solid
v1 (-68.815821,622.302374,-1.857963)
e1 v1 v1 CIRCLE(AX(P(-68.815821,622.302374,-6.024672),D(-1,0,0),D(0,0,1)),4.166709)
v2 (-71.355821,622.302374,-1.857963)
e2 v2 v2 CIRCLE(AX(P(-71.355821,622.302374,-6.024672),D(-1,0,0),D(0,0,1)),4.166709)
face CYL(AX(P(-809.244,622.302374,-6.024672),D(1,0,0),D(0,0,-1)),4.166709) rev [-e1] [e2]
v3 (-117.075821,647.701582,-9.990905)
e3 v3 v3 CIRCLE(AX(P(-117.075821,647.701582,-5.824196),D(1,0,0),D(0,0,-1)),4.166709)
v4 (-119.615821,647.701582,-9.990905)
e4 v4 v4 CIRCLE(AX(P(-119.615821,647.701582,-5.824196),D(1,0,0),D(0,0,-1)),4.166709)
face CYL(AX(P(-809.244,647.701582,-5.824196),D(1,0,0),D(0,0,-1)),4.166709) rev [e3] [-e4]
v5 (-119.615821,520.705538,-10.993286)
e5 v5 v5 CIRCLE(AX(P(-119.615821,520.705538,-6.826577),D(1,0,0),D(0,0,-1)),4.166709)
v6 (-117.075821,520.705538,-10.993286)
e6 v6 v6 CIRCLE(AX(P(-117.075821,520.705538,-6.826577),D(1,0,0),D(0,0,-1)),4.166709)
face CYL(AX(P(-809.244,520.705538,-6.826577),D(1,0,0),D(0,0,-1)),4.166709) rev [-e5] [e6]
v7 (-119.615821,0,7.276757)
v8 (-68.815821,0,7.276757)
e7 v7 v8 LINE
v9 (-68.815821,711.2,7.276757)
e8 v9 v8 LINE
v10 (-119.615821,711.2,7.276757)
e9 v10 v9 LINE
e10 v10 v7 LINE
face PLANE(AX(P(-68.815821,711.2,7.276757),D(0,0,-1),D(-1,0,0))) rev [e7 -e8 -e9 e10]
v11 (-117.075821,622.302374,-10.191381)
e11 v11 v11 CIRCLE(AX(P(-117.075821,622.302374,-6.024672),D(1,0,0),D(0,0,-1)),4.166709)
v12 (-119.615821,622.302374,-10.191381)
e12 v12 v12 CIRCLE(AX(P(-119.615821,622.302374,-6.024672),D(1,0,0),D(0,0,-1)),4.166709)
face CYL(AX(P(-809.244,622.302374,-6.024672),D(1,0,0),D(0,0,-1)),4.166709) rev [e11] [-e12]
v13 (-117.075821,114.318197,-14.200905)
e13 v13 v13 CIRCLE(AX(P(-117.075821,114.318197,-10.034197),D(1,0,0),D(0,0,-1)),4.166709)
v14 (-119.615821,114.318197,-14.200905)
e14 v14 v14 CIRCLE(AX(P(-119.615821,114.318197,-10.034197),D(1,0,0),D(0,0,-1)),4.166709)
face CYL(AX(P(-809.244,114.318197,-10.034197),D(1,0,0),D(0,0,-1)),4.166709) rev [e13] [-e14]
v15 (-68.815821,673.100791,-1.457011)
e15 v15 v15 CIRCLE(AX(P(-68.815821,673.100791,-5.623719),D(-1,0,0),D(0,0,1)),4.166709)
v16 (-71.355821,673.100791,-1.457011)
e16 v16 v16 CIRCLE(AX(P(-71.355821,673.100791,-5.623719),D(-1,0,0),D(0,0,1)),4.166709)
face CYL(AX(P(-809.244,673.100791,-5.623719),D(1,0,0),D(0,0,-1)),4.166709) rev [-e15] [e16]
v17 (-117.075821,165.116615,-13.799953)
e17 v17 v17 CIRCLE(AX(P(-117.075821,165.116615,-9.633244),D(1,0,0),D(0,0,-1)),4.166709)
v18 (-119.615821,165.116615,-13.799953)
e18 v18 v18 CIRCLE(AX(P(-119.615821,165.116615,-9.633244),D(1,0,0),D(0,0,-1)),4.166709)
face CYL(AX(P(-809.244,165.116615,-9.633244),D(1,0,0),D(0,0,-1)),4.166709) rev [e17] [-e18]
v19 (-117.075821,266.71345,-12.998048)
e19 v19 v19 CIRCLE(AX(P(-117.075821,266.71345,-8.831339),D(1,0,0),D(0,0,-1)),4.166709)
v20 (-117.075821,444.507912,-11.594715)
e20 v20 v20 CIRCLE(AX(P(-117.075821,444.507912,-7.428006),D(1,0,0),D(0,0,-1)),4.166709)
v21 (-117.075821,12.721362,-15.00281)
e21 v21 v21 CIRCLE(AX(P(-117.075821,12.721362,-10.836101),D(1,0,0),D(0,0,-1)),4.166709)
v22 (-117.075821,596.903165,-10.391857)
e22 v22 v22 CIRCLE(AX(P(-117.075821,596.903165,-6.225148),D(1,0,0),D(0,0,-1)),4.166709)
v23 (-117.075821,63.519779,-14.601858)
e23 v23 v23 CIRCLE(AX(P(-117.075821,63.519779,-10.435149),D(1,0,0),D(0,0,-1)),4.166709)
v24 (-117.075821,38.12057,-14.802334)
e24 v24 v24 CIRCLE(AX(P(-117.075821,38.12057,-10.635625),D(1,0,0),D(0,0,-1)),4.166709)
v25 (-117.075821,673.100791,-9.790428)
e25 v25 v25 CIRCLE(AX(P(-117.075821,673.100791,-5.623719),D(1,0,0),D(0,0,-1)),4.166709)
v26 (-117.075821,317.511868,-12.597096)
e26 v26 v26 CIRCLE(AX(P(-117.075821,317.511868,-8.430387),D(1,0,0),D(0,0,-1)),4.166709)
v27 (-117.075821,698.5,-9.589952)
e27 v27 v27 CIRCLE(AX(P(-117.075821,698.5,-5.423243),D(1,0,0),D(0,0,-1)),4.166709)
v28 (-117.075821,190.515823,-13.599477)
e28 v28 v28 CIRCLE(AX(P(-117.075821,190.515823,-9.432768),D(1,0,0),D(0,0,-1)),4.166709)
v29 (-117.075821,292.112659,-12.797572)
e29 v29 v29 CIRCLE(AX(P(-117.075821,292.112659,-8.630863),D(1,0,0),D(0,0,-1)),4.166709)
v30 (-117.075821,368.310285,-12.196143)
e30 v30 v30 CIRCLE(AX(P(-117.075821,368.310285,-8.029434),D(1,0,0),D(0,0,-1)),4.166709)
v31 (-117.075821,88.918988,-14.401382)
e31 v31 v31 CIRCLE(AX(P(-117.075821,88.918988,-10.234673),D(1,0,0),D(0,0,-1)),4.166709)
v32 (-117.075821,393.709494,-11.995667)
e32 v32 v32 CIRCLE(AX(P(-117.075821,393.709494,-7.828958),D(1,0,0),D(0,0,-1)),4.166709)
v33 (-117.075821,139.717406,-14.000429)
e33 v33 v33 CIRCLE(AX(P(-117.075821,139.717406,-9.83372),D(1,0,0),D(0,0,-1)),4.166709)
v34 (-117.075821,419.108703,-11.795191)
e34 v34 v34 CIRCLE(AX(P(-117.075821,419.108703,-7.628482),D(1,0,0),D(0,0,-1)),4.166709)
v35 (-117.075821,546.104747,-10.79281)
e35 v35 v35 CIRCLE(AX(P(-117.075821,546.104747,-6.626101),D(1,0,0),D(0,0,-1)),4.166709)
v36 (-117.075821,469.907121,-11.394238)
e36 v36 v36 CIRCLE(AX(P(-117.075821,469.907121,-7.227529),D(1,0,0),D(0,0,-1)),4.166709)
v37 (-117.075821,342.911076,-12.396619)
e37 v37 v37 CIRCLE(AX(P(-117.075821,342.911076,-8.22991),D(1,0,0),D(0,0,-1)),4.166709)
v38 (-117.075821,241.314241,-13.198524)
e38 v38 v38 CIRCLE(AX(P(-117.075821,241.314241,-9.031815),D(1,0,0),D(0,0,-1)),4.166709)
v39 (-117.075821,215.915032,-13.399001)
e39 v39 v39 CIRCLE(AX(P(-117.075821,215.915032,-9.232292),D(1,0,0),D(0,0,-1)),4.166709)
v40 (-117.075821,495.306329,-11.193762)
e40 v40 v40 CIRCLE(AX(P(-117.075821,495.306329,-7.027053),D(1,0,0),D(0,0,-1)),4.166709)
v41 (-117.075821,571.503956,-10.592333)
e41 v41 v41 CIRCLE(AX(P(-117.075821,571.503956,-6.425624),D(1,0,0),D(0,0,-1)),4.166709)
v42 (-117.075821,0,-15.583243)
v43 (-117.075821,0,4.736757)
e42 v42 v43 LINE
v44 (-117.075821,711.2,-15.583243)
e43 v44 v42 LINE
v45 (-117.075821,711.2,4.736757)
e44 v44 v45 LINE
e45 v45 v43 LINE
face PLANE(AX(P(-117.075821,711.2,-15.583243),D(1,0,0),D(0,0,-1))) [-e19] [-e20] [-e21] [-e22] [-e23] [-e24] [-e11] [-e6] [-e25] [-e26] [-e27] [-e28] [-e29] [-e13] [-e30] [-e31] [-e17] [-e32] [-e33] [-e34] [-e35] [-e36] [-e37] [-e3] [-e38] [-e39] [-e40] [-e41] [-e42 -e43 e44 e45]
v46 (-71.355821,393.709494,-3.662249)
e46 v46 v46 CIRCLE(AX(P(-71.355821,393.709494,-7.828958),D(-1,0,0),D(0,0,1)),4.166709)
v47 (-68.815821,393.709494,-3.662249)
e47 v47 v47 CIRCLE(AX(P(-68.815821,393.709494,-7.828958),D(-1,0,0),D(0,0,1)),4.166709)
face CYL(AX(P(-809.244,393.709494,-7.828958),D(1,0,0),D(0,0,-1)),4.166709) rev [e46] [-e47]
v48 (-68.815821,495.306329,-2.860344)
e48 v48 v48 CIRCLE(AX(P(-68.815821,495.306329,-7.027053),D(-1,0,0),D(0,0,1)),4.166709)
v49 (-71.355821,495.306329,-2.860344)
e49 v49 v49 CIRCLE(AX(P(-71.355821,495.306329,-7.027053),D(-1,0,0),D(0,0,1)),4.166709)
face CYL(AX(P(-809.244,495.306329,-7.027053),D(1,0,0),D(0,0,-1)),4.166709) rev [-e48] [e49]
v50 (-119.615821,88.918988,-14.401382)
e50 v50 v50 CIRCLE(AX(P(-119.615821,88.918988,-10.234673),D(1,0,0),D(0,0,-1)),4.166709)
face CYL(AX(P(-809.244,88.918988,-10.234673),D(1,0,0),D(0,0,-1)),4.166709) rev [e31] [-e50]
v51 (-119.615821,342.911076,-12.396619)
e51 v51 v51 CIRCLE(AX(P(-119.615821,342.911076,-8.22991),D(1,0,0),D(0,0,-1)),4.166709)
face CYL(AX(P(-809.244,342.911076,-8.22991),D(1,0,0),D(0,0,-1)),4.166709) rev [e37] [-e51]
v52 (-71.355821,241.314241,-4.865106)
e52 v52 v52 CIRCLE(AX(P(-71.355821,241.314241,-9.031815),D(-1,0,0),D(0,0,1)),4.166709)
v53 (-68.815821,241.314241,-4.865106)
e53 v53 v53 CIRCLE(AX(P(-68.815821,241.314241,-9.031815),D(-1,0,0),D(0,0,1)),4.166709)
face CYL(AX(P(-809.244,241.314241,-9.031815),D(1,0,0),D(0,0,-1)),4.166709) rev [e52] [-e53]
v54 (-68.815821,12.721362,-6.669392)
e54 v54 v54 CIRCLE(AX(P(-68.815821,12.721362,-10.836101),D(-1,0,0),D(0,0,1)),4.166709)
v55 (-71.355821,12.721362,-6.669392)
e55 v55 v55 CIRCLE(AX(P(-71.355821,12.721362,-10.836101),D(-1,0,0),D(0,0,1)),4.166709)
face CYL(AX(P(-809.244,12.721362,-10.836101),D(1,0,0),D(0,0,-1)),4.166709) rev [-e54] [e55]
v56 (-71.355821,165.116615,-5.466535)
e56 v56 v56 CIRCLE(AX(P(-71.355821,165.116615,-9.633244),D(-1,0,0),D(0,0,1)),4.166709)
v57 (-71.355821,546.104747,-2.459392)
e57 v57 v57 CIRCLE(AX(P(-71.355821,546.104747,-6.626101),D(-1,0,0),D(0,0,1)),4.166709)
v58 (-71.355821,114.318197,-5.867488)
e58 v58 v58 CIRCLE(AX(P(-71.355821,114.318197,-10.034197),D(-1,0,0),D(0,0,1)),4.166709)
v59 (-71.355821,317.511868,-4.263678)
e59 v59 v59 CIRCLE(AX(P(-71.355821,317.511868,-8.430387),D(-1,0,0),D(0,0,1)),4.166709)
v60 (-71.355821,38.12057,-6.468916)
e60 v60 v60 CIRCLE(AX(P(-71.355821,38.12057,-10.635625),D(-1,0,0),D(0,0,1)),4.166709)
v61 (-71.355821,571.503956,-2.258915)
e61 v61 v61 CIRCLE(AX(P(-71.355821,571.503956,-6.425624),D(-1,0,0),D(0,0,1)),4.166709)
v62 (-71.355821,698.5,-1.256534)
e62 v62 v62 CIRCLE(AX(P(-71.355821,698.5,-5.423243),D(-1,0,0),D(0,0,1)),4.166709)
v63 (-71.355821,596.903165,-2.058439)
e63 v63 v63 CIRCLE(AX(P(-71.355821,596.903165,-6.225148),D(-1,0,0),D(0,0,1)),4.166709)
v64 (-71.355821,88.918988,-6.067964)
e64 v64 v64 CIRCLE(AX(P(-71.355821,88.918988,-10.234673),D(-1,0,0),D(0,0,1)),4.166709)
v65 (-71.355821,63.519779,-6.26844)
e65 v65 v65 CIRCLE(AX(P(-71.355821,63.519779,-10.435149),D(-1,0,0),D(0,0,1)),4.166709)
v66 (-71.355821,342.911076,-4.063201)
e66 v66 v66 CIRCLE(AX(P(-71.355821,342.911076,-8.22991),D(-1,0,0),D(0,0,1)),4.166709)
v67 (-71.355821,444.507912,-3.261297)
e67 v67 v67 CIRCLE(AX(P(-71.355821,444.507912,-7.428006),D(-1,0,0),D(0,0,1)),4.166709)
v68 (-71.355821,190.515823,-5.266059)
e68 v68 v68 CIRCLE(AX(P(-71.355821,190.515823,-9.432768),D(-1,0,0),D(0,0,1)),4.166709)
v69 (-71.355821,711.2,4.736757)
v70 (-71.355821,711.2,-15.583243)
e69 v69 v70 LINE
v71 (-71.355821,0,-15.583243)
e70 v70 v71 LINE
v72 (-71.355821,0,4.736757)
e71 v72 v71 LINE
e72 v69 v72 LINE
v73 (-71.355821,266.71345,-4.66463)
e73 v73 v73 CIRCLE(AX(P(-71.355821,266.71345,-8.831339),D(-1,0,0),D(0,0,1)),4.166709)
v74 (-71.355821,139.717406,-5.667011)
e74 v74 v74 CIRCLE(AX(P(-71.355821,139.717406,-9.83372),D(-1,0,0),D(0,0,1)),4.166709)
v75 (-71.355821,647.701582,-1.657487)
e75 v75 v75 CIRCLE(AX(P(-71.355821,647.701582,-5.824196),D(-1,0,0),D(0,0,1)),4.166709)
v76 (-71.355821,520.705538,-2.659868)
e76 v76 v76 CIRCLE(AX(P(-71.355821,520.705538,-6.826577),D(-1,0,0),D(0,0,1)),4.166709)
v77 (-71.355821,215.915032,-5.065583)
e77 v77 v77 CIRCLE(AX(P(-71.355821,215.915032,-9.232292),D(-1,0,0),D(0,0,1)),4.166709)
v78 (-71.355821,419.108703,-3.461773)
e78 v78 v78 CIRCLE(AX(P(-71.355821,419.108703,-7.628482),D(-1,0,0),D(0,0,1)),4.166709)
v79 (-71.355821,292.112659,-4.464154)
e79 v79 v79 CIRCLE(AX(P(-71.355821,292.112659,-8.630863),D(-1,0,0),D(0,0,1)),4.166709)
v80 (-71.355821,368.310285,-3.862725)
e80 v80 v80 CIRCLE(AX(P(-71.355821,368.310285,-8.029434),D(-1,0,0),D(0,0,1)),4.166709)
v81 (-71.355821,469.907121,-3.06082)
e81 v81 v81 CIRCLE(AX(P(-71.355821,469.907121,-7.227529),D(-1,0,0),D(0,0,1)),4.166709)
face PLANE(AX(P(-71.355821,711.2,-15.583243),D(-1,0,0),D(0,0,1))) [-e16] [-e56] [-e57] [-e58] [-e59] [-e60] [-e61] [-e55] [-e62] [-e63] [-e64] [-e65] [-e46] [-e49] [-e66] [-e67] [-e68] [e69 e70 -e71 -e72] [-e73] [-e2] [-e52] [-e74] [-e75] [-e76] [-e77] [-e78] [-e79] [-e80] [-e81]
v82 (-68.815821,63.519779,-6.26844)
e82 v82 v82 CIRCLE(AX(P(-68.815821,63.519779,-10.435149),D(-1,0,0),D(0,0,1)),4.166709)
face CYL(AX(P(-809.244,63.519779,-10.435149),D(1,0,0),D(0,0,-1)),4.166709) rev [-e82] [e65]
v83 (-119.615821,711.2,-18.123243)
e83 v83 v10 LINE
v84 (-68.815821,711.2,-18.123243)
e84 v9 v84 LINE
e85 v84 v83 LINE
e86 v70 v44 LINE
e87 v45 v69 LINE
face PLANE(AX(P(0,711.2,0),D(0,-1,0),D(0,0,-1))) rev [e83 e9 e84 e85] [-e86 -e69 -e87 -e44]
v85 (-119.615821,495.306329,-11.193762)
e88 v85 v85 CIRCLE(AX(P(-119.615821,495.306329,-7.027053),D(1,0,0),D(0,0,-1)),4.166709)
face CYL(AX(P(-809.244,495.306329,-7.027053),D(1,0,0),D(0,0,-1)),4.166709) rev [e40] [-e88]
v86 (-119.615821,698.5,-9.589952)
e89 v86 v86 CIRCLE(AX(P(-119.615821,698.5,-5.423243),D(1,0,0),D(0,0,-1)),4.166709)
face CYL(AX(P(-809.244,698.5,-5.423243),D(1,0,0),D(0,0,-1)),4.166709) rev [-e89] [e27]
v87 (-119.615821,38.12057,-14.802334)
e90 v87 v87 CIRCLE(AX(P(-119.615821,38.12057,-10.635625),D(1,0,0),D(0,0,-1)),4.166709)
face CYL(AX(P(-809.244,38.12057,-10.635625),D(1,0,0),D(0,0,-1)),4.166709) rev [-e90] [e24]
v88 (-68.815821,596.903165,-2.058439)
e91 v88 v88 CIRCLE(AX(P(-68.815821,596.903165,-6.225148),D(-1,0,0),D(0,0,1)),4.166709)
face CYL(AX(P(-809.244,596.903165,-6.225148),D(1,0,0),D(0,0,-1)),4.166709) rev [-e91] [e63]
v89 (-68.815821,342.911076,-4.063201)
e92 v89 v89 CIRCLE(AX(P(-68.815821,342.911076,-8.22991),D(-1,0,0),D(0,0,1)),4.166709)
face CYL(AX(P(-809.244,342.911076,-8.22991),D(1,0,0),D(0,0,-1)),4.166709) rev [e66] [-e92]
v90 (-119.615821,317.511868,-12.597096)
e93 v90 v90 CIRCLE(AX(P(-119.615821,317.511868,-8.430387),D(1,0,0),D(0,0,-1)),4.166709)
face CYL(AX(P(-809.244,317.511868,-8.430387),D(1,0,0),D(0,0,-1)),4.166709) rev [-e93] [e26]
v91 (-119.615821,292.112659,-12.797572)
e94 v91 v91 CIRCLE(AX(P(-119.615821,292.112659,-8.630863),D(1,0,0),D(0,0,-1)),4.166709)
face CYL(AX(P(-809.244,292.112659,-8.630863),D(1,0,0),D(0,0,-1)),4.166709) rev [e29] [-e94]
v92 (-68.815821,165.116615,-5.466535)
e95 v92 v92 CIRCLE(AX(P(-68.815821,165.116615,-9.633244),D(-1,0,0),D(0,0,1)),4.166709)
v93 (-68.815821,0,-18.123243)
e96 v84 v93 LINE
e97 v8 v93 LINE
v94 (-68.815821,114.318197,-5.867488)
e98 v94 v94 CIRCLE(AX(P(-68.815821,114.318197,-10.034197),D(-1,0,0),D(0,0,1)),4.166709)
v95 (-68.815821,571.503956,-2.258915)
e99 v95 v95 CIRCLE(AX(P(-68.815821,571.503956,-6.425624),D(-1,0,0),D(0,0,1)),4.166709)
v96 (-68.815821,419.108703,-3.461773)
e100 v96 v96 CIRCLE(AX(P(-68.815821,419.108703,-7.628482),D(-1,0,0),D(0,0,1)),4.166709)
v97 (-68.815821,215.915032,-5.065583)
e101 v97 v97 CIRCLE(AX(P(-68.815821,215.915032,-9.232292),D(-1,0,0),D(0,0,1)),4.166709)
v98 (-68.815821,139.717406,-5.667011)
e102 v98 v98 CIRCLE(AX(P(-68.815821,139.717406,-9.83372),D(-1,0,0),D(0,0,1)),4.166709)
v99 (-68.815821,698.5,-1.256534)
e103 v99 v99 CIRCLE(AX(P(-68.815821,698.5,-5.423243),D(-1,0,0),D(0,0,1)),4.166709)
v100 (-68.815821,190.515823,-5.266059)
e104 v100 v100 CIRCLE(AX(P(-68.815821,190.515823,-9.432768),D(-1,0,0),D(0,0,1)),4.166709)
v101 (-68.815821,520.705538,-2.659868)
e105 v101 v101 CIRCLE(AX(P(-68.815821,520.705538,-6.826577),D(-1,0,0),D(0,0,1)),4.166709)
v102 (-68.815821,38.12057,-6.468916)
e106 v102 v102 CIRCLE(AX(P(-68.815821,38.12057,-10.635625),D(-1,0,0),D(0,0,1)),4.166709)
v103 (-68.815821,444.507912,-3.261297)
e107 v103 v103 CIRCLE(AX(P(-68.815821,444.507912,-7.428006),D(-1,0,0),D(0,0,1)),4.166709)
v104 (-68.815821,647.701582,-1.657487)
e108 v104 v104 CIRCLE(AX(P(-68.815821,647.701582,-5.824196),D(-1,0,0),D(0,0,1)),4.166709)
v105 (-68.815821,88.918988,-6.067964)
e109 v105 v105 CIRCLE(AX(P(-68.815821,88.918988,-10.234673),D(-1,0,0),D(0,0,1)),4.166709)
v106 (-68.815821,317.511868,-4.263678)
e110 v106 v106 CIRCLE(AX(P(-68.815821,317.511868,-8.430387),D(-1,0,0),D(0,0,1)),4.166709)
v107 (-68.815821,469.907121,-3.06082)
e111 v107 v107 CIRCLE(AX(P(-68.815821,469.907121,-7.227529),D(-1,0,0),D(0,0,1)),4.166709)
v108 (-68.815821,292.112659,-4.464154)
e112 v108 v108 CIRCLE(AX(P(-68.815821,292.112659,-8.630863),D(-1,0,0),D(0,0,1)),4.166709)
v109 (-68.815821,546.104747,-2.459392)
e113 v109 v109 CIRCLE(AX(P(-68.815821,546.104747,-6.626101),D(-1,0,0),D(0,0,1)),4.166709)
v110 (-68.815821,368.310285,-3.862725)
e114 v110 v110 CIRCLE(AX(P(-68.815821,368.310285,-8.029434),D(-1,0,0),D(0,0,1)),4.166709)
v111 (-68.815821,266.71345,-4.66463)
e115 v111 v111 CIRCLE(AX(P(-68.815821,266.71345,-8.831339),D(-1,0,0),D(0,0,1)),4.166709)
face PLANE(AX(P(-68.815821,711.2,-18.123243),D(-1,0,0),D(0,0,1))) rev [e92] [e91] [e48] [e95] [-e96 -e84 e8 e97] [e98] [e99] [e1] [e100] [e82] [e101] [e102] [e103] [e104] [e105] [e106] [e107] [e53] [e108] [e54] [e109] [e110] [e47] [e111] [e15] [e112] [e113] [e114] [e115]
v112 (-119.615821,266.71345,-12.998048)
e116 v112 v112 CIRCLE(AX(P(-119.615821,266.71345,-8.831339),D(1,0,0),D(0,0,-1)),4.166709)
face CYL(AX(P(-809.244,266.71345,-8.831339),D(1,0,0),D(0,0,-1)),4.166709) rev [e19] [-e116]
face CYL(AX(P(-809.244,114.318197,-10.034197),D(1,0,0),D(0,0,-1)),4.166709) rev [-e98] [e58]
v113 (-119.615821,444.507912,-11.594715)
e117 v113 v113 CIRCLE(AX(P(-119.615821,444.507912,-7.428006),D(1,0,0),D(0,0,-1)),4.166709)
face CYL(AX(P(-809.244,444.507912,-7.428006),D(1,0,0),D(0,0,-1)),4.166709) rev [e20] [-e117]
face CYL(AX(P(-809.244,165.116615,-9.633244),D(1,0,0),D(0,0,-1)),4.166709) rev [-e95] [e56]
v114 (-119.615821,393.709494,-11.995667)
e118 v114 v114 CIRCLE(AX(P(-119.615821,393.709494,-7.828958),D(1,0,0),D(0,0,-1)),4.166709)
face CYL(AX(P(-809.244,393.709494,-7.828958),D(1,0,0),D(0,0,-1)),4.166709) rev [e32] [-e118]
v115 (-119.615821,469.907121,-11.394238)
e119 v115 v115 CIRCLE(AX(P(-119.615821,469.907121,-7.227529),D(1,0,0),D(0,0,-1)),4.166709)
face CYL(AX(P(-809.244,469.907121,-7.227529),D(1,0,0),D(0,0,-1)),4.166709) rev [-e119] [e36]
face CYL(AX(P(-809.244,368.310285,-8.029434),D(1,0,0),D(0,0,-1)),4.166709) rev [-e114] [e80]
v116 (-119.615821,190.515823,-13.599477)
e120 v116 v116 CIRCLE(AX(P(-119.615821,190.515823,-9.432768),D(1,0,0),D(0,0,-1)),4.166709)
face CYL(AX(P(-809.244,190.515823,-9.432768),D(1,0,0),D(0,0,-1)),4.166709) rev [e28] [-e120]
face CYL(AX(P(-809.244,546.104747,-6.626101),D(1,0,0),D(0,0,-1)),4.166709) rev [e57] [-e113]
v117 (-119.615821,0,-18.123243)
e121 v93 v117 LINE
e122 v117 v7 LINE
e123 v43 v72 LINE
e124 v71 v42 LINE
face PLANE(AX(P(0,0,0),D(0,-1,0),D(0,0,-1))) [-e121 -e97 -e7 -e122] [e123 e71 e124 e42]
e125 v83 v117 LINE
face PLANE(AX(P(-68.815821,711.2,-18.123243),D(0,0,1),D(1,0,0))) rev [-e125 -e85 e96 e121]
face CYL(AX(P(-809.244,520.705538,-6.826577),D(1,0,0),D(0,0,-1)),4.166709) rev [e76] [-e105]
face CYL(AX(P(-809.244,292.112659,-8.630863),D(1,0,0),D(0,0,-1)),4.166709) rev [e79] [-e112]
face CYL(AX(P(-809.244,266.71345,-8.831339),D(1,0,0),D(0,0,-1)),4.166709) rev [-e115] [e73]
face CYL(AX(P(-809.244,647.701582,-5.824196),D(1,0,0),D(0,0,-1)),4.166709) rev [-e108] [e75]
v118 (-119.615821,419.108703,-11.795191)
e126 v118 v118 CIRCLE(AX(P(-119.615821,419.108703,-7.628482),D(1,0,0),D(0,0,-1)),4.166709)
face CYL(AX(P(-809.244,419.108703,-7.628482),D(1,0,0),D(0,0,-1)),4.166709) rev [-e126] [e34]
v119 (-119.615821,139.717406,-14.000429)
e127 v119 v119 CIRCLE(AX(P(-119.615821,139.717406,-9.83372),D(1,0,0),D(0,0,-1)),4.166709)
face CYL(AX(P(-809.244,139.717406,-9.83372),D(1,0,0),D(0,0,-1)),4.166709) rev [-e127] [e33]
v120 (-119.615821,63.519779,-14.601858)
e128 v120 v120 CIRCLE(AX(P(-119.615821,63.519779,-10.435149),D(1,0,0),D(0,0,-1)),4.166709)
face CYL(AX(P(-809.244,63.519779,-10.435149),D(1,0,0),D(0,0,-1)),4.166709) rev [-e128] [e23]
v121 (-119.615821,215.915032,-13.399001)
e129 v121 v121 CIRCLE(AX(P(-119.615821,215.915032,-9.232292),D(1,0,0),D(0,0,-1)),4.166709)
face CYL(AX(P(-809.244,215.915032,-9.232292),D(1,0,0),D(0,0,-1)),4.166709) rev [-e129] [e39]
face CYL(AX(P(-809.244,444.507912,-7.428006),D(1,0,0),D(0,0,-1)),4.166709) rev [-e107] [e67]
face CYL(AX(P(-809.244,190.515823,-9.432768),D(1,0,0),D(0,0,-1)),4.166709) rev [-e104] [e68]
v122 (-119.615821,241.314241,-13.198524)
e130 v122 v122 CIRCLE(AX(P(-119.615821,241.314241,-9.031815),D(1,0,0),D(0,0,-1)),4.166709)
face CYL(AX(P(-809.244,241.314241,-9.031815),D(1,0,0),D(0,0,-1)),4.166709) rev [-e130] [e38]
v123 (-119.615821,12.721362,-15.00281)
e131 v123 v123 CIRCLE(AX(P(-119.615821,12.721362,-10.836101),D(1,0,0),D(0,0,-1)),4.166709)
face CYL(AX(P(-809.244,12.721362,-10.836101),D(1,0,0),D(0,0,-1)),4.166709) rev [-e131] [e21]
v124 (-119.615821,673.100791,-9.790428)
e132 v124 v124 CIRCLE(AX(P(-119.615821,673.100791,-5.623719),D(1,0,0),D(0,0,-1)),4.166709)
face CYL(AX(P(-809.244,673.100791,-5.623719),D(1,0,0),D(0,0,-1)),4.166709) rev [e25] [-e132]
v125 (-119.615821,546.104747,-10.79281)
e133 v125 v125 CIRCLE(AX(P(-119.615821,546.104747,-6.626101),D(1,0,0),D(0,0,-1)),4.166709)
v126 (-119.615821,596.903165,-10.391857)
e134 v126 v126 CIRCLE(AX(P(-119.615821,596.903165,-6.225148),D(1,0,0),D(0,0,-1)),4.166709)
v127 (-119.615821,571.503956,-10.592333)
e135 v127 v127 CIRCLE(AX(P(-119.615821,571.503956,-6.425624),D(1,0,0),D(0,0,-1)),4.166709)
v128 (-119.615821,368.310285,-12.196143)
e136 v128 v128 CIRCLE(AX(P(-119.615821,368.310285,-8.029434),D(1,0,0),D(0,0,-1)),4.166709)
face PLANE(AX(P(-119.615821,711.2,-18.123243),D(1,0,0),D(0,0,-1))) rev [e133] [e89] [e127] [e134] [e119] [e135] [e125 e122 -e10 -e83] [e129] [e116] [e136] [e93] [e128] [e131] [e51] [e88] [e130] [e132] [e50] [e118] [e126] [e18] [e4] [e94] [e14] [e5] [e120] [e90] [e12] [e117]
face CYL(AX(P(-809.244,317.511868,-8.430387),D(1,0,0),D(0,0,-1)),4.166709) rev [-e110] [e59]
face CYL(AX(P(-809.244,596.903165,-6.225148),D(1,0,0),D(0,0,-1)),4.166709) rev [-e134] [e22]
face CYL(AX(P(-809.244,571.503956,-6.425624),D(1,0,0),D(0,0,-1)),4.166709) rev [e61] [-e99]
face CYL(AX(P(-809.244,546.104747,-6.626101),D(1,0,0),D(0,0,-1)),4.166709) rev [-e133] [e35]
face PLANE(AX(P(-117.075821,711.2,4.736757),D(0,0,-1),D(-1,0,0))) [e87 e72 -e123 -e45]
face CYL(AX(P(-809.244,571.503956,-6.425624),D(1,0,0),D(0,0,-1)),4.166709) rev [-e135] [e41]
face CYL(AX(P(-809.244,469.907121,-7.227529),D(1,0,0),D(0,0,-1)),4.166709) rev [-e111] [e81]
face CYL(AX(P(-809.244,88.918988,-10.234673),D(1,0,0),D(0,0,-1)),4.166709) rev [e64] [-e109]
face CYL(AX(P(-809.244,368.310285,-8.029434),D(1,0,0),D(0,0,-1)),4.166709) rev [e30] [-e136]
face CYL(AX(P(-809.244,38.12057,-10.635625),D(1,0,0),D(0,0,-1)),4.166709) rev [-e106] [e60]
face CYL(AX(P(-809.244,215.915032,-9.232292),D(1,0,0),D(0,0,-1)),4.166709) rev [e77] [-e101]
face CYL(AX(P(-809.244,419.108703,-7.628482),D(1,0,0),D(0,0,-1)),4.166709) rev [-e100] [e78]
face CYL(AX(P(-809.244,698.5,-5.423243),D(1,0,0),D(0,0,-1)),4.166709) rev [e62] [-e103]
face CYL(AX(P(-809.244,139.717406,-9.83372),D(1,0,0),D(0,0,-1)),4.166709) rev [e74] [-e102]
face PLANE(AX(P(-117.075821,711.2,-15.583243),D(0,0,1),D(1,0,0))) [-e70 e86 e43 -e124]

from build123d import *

# Parameters (mm, degrees)
BOSS_EXTRUDE1_OUTLINE_W   = 50.8
BOSS_EXTRUDE1_OUTLINE_H   = 25.4
BOSS_EXTRUDE1_OUTLINE_W_2 = 45.72
BOSS_EXTRUDE1_OUTLINE_H_2 = 20.32
BOSS_EXTRUDE1_DEPTH       = 711.2
SKETCH3_R                 = 4.166708964
CUT_EXTRUDE1_DEPTH        = 809.244


# Read off the part's stored shape, not the designer's step: Boss-Extrude1
with BuildPart() as part:
    # Boss-Extrude1 outline → Boss-Extrude1 (new body)
    with BuildSketch(Plane(origin=(0, 0, 0), x_dir=(1, 0, 0), z_dir=(0, 1, 0))):
        with Locations((-94.215820821, 5.423243243)):
            Rectangle(BOSS_EXTRUDE1_OUTLINE_W, BOSS_EXTRUDE1_OUTLINE_H)
        with Locations((-94.215820821, 5.423243243)):
            Rectangle(BOSS_EXTRUDE1_OUTLINE_W_2, BOSS_EXTRUDE1_OUTLINE_H_2, mode=Mode.SUBTRACT)
    extrude(amount=BOSS_EXTRUDE1_DEPTH)

    # Sketch3 → Cut-Extrude1 (cut)
    with BuildSketch(Plane(origin=(0, 0, 0), x_dir=(0, 0, -1), z_dir=(1, 0, 0))):
        with Locations(Location((5.423243243, 698.5, 0), (0, 0, 180))):
            Circle(SKETCH3_R)
        with Locations(Location((5.623719473, 673.100791168, 0), (0, 0, 180))):
            Circle(SKETCH3_R)
        with Locations(Location((5.824195703, 647.701582336, 0), (0, 0, 180))):
            Circle(SKETCH3_R)
        with Locations(Location((6.024671933, 622.302373505, 0), (0, 0, 180))):
            Circle(SKETCH3_R)
        with Locations(Location((6.225148163, 596.903164673, 0), (0, 0, 180))):
            Circle(SKETCH3_R)
        with Locations(Location((6.425624393, 571.503955841, 0), (0, 0, 180))):
            Circle(SKETCH3_R)
        with Locations(Location((6.626100623, 546.104747009, 0), (0, 0, 180))):
            Circle(SKETCH3_R)
        with Locations(Location((6.826576853, 520.705538177, 0), (0, 0, 180))):
            Circle(SKETCH3_R)
        with Locations(Location((7.027053082, 495.306329346, 0), (0, 0, 180))):
            Circle(SKETCH3_R)
        with Locations(Location((7.227529312, 469.907120514, 0), (0, 0, 180))):
            Circle(SKETCH3_R)
        with Locations(Location((7.428005542, 444.507911682, 0), (0, 0, 180))):
            Circle(SKETCH3_R)
        with Locations(Location((7.628481772, 419.10870285, 0), (0, 0, 180))):
            Circle(SKETCH3_R)
        with Locations(Location((7.828958002, 393.709494018, 0), (0, 0, 180))):
            Circle(SKETCH3_R)
        with Locations(Location((8.029434232, 368.310285187, 0), (0, 0, 180))):
            Circle(SKETCH3_R)
        with Locations(Location((8.229910462, 342.911076355, 0), (0, 0, 180))):
            Circle(SKETCH3_R)
        with Locations(Location((8.430386692, 317.511867523, 0), (0, 0, 180))):
            Circle(SKETCH3_R)
        with Locations(Location((8.630862922, 292.112658691, 0), (0, 0, 180))):
            Circle(SKETCH3_R)
        with Locations(Location((8.831339152, 266.713449859, 0), (0, 0, 180))):
            Circle(SKETCH3_R)
        with Locations(Location((9.031815381, 241.314241028, 0), (0, 0, 180))):
            Circle(SKETCH3_R)
        with Locations(Location((9.232291611, 215.915032196, 0), (0, 0, 180))):
            Circle(SKETCH3_R)
        with Locations(Location((9.432767841, 190.515823364, 0), (0, 0, 180))):
            Circle(SKETCH3_R)
        with Locations(Location((9.633244071, 165.116614532, 0), (0, 0, 180))):
            Circle(SKETCH3_R)
        with Locations(Location((9.833720301, 139.7174057, 0), (0, 0, 180))):
            Circle(SKETCH3_R)
        with Locations(Location((10.034196531, 114.318196869, 0), (0, 0, 180))):
            Circle(SKETCH3_R)
        with Locations(Location((10.234672761, 88.918988037, 0), (0, 0, 180))):
            Circle(SKETCH3_R)
        with Locations(Location((10.435148991, 63.519779205, 0), (0, 0, 180))):
            Circle(SKETCH3_R)
        with Locations(Location((10.635625221, 38.120570373, 0), (0, 0, 180))):
            Circle(SKETCH3_R)
        with Locations(Location((10.836101451, 12.721361541, 0), (0, 0, 180))):
            Circle(SKETCH3_R)
    extrude(amount=-CUT_EXTRUDE1_DEPTH, mode=Mode.SUBTRACT)


solid = part.part
